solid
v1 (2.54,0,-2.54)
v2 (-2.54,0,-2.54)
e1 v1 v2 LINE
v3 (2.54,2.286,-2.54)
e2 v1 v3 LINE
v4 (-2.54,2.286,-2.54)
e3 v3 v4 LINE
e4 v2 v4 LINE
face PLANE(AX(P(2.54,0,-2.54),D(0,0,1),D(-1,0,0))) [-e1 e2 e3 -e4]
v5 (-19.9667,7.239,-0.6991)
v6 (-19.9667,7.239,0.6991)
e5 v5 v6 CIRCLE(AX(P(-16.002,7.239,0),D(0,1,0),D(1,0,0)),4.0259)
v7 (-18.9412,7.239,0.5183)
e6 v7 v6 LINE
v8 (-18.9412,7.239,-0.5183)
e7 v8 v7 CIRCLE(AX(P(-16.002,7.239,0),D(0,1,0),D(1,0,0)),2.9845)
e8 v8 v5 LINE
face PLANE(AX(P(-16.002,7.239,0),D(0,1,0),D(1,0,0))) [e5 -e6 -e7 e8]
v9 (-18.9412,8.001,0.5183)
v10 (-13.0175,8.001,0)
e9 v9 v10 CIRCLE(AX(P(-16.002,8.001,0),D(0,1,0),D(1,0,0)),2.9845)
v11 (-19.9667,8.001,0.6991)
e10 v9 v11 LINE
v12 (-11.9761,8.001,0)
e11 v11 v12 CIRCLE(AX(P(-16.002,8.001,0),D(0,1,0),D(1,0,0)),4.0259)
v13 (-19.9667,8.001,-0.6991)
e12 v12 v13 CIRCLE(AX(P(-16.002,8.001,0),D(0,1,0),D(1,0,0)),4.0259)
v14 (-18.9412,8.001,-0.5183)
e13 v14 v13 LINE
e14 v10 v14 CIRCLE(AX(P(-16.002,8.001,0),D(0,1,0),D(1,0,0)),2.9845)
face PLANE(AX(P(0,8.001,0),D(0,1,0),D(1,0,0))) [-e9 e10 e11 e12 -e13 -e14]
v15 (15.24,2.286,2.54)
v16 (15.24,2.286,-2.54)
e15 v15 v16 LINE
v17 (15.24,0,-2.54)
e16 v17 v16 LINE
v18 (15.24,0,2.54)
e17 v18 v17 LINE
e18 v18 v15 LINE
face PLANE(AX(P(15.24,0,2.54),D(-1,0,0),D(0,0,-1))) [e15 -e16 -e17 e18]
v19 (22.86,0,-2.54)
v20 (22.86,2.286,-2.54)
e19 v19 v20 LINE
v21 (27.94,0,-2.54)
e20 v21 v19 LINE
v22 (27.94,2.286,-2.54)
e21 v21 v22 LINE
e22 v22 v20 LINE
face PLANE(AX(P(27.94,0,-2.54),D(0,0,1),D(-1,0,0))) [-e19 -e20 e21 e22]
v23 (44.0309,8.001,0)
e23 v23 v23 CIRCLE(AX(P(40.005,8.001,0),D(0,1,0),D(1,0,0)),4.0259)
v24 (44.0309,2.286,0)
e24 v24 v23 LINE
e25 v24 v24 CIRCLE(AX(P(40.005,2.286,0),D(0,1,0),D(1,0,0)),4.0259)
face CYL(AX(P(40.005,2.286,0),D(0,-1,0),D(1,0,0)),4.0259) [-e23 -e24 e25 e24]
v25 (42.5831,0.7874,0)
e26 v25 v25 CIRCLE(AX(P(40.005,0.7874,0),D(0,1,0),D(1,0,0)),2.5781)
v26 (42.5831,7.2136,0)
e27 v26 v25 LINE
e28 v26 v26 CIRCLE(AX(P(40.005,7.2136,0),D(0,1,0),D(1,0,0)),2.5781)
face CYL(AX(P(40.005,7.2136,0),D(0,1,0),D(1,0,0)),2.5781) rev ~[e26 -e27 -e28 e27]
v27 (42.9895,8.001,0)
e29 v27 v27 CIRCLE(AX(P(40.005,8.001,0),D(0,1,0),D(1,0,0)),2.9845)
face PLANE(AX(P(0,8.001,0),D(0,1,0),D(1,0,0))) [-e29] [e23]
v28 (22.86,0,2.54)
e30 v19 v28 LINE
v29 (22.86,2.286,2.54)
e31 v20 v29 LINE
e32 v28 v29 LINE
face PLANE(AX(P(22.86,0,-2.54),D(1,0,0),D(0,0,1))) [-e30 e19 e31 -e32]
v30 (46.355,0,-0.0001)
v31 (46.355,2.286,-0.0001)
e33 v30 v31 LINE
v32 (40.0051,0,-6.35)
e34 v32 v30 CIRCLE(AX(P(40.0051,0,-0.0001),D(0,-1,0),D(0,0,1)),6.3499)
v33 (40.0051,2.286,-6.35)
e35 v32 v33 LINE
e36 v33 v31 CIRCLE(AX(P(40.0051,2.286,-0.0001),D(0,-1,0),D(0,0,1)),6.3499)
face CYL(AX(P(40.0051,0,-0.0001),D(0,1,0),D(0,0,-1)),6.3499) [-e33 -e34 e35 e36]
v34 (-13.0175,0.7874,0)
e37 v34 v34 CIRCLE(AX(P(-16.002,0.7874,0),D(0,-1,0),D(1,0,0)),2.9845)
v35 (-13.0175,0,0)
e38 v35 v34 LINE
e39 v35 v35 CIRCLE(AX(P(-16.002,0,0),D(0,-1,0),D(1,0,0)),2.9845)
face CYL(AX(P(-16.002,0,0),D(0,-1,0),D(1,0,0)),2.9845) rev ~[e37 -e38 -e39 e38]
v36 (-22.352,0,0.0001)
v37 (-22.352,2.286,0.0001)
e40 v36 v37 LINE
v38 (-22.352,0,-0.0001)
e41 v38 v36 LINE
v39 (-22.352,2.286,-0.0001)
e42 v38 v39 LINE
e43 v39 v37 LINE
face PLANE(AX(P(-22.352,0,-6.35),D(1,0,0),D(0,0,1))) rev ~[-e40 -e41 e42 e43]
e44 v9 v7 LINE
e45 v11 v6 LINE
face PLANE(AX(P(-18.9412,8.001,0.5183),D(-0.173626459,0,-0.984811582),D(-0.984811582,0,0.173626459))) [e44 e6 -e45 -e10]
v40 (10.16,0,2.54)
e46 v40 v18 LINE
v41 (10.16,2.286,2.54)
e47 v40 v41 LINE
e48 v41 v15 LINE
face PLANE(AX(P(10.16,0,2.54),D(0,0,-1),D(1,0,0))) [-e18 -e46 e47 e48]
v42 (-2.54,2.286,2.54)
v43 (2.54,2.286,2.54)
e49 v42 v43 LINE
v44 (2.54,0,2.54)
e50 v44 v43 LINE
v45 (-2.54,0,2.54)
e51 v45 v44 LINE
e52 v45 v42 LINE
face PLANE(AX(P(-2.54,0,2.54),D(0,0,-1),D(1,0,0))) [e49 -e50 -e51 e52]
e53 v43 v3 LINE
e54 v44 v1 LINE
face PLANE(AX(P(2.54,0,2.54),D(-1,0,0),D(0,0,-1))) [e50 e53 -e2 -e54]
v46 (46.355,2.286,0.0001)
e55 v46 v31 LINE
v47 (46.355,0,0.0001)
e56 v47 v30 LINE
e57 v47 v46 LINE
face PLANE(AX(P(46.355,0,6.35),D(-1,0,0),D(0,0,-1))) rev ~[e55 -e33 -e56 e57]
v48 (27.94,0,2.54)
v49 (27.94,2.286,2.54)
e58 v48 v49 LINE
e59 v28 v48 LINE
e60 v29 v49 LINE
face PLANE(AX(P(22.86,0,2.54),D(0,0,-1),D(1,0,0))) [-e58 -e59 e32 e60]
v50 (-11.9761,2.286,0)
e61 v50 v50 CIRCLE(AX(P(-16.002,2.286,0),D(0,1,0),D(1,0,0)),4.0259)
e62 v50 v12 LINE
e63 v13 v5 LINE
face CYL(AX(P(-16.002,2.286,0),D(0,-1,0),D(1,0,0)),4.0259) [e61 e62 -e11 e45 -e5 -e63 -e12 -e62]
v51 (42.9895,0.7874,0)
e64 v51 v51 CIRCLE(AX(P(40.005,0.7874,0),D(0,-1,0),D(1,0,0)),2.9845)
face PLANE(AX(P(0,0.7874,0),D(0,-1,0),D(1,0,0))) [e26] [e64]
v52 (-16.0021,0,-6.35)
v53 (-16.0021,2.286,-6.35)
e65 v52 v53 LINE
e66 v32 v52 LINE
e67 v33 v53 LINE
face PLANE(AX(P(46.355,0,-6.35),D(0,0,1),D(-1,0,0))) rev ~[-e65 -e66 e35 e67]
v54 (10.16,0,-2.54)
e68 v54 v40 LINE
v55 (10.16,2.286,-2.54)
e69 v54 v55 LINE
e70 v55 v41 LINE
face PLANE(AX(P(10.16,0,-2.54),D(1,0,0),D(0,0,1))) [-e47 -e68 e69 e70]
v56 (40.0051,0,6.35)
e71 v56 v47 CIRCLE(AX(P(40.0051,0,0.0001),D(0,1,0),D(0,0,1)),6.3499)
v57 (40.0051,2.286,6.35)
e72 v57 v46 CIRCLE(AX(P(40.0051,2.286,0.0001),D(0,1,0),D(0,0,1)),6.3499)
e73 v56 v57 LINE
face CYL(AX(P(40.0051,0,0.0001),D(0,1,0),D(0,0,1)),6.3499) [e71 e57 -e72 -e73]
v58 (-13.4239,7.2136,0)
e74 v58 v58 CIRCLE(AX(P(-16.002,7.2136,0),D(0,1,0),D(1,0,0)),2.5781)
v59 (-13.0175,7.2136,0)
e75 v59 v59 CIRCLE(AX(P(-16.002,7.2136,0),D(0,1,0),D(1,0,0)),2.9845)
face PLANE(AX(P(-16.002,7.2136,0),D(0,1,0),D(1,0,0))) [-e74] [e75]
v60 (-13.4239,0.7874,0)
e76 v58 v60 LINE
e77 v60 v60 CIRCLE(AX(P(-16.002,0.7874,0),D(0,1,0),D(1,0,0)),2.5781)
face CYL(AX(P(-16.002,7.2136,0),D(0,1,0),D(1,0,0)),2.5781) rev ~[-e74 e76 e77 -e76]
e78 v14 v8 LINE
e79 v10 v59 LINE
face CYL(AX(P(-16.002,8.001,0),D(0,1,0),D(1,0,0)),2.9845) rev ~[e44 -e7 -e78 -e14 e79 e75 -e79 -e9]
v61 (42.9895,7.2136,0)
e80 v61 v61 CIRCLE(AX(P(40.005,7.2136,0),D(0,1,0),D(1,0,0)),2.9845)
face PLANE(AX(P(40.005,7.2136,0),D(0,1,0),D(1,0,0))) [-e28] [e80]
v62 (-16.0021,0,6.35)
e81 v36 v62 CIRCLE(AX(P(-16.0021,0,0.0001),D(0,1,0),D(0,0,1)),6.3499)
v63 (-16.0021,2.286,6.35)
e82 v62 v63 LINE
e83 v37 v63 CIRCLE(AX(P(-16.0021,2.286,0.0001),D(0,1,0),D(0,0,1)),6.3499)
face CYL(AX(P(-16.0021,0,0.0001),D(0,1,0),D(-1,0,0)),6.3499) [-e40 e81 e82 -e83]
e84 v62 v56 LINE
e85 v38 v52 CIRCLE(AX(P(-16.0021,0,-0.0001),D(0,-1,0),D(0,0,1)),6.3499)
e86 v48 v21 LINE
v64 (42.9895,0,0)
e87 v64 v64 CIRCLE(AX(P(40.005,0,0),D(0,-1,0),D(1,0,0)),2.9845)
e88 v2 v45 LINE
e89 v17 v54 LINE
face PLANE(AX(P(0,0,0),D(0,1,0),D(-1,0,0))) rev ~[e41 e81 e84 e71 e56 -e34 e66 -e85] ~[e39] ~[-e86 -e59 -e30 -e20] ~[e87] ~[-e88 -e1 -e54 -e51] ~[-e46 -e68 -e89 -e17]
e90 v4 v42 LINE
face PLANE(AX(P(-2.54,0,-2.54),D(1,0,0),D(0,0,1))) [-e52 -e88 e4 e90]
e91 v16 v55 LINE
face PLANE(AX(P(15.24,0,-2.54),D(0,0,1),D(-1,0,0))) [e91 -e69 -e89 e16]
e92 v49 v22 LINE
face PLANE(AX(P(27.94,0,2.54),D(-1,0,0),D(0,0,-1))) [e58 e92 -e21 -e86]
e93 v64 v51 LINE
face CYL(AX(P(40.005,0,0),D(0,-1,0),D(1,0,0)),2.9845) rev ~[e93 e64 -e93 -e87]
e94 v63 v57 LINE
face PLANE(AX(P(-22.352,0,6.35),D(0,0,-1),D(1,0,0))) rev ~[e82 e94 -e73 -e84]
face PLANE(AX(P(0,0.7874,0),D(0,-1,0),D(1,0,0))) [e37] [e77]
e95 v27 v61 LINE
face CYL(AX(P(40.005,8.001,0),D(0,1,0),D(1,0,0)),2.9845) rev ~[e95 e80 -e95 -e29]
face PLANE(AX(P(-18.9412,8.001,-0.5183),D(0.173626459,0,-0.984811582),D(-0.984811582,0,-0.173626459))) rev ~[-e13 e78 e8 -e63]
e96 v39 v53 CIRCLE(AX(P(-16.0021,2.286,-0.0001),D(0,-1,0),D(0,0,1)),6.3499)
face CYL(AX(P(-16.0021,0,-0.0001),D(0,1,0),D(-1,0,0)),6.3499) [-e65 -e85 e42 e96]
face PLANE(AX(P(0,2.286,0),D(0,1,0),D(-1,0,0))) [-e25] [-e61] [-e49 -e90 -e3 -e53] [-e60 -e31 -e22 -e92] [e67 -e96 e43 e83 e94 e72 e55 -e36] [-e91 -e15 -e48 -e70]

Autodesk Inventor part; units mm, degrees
ref_plane "YZ Plane" through (0, 0, 0) normal (1, 0, 0) x (0, 1, 0)
ref_plane "XZ Plane" through (0, 0, 0) normal (0, 1, 0) x (-1, 0, 0)
ref_plane "XY Plane" through (0, 0, 0) normal (0, 0, 1) x (1, 0, 0)
sketch "Sketch1" plane through (0, 0, 0) normal (0, 1, 0) x (-1, 0, 0)
  line L0 (22.352, 6.35) -> (-46.355, 6.35)
  line L1 (-46.355, 6.35) -> (-46.355, -6.35)
  line L2 (-46.355, -6.35) -> (22.352, -6.35)
  line L3 (22.352, -6.35) -> (22.352, 6.35)
  line L4 (-2.54, -2.54) -> (2.54, -2.54)
  line L5 (2.54, -2.54) -> (2.54, 2.54)
  line L6 (2.54, 2.54) -> (-2.54, 2.54)
  line L7 (-2.54, 2.54) -> (-2.54, -2.54)
  line L8 (-2.54, -2.54) -> (2.54, 2.54) construction
  line L9 (2.54, -2.54) -> (-2.54, 2.54) construction
  line L10 (-10.16, 2.54) -> (-15.24, 2.54)
  line L11 (-15.24, 2.54) -> (-15.24, -2.54)
  line L12 (-15.24, -2.54) -> (-10.16, -2.54)
  line L13 (-10.16, -2.54) -> (-10.16, 2.54)
  line L14 (-10.16, 2.54) -> (-15.24, -2.54) construction
  line L15 (-15.24, 2.54) -> (-10.16, -2.54) construction
  line L16 (-22.86, 2.54) -> (-27.94, 2.54)
  line L17 (-27.94, 2.54) -> (-27.94, -2.54)
  line L18 (-27.94, -2.54) -> (-22.86, -2.54)
  line L19 (-22.86, -2.54) -> (-22.86, 2.54)
  line L20 (-22.86, 2.54) -> (-27.94, -2.54) construction
  line L21 (-27.94, 2.54) -> (-22.86, -2.54) construction
  point P0 (0, 0)
  point P1 (-12.7, 0)
  point P2 (-25.4, 0)
  dimension "d0" = 68.707
  dimension "d1" = 12.7
  dimension "d2" = 5.08
  dimension "d3" = 5.08
  dimension "d4" = 5.08
  dimension "d5" = 5.08
  dimension "d6" = 12.7
  dimension "d7" = 12.7
  dimension "d8" = 6.35
  dimension "d9" = 22.352
  dimension "d37" = 5.08
  dimension "d38" = 5.08
extrude "Extrusion1" add sketch "Sketch1" along normal blind 2.286
sketch "Sketch2" plane through (0, 2.286, 0) normal (0, 1, 0) x (1, 0, 0)
  line L0 (-22.352, 6.35) -> (-22.352, -6.35) projected
  circle A0 centre (-16.002, 0) radius 4.0259
  point P0 (0, 0)
  dimension "d12" = 6.35
  dimension "d13" = 8.0518
extrude "Extrusion2" add sketch "Sketch2" along normal blind 5.715
sketch "Sketch3" plane through (-16.002, 8.001, 0) normal (0, 1, 0) x (1, 0, 0)
  circle A0 centre (0, 0) radius 2.9845
  point P0 (16.002, 0)
  dimension "d16" = 5.969
extrude "Extrusion3" cut sketch "Sketch3" against normal blind 0.7874
sketch "Sketch4" plane through (0, 0, 0) normal (0, -1, 0) x (1, 0, 0)
  circle A0 centre (-16.002, 0) radius 2.9845 projected
  circle A1 centre (-16.002, 0) radius 2.9845
  point P0 (0, 0)
  dimension "d39" = 5.969
extrude "Extrusion4" cut sketch "Sketch4" against normal blind 0.7874
sketch "Sketch5" plane through (-16.002, 7.2136, 0) normal (0, 1, 0) x (1, 0, 0)
  circle A0 centre (0, 0) radius 2.5781
  point P0 (16.002, 0)
  dimension "d21" = 5.1562
extrude "Extrusion5" cut sketch "Sketch5" against normal through all
sketch "Sketch6" plane through (0, 2.286, 0) normal (0, 1, 0) x (1, 0, 0)
  line L0 (46.355, -6.35) -> (46.355, 6.35) projected
  circle A0 centre (40.005, 0) radius 4.0259
  point P0 (0, 0)
  dimension "d24" = 6.35
  dimension "d25" = 8.0518
extrude "Extrusion6" add sketch "Sketch6" along normal blind 5.715
sketch "Sketch7" plane through (40.005, 8.001, 0) normal (0, 1, 0) x (1, 0, 0)
  circle A0 centre (0, 0) radius 2.9845
  point P0 (-40.005, 0)
  dimension "d28" = 5.969
extrude "Extrusion7" cut sketch "Sketch7" against normal blind 0.7874
sketch "Sketch8" plane through (0, 0, 0) normal (0, -1, 0) x (1, 0, 0)
  circle A0 centre (40.005, 0) radius 2.9845 projected
  circle A1 centre (40.005, 0) radius 2.9845
  point P0 (0, 0)
  dimension "d40" = 5.969
extrude "Extrusion8" cut sketch "Sketch8" against normal blind 0.7874
sketch "Sketch9" plane through (40.005, 7.2136, 0) normal (0, 1, 0) x (1, 0, 0)
  circle A0 centre (0, 0) radius 2.5781
  point P0 (-40.005, 0)
  dimension "d33" = 5.1562
extrude "Extrusion9" cut sketch "Sketch9" against normal through all
fillet "Fillet1" radius 6.35 4 edges at (46.355, 1.143, 6.35) (46.355, 1.143, -6.35) (-22.352, 1.143, 6.35) (-22.352, 1.143, -6.35)
sketch "Sketch12" plane through (-16.002, 8.001, 0) normal (0, 1, 0) x (1, 0, 0)
  circle A0 centre (0, 0) radius 4.0259 projected
  line L0 (0, 0) -> (4.0259, 0) construction
  line L1 (0, 0) -> (4.0259, 0) construction
  circle A1 centre (0, 0) radius 2.9845 projected
  line L2 (-2.9392, 0.5183) -> (-3.9647, 0.6991)
  line L3 (-2.9392, -0.5183) -> (-3.9647, -0.6991)
  arc A2 (-2.9392, 0.5183) -> (-2.9392, -0.5183) centre (0, 0) ccw
  arc A3 (-3.9647, 0.6991) -> (-3.9647, -0.6991) centre (0, 0) ccw
  point P0 (16.002, 0)
  point P1 (-2.9392, 0.5183)
extrude "Extrusion11" cut sketch "Sketch12" against normal blind 0.762 contours L2 A1 L3 A0 picked at (-3.6725, 0.0578)
properties part number "VexLegoMountThick"
